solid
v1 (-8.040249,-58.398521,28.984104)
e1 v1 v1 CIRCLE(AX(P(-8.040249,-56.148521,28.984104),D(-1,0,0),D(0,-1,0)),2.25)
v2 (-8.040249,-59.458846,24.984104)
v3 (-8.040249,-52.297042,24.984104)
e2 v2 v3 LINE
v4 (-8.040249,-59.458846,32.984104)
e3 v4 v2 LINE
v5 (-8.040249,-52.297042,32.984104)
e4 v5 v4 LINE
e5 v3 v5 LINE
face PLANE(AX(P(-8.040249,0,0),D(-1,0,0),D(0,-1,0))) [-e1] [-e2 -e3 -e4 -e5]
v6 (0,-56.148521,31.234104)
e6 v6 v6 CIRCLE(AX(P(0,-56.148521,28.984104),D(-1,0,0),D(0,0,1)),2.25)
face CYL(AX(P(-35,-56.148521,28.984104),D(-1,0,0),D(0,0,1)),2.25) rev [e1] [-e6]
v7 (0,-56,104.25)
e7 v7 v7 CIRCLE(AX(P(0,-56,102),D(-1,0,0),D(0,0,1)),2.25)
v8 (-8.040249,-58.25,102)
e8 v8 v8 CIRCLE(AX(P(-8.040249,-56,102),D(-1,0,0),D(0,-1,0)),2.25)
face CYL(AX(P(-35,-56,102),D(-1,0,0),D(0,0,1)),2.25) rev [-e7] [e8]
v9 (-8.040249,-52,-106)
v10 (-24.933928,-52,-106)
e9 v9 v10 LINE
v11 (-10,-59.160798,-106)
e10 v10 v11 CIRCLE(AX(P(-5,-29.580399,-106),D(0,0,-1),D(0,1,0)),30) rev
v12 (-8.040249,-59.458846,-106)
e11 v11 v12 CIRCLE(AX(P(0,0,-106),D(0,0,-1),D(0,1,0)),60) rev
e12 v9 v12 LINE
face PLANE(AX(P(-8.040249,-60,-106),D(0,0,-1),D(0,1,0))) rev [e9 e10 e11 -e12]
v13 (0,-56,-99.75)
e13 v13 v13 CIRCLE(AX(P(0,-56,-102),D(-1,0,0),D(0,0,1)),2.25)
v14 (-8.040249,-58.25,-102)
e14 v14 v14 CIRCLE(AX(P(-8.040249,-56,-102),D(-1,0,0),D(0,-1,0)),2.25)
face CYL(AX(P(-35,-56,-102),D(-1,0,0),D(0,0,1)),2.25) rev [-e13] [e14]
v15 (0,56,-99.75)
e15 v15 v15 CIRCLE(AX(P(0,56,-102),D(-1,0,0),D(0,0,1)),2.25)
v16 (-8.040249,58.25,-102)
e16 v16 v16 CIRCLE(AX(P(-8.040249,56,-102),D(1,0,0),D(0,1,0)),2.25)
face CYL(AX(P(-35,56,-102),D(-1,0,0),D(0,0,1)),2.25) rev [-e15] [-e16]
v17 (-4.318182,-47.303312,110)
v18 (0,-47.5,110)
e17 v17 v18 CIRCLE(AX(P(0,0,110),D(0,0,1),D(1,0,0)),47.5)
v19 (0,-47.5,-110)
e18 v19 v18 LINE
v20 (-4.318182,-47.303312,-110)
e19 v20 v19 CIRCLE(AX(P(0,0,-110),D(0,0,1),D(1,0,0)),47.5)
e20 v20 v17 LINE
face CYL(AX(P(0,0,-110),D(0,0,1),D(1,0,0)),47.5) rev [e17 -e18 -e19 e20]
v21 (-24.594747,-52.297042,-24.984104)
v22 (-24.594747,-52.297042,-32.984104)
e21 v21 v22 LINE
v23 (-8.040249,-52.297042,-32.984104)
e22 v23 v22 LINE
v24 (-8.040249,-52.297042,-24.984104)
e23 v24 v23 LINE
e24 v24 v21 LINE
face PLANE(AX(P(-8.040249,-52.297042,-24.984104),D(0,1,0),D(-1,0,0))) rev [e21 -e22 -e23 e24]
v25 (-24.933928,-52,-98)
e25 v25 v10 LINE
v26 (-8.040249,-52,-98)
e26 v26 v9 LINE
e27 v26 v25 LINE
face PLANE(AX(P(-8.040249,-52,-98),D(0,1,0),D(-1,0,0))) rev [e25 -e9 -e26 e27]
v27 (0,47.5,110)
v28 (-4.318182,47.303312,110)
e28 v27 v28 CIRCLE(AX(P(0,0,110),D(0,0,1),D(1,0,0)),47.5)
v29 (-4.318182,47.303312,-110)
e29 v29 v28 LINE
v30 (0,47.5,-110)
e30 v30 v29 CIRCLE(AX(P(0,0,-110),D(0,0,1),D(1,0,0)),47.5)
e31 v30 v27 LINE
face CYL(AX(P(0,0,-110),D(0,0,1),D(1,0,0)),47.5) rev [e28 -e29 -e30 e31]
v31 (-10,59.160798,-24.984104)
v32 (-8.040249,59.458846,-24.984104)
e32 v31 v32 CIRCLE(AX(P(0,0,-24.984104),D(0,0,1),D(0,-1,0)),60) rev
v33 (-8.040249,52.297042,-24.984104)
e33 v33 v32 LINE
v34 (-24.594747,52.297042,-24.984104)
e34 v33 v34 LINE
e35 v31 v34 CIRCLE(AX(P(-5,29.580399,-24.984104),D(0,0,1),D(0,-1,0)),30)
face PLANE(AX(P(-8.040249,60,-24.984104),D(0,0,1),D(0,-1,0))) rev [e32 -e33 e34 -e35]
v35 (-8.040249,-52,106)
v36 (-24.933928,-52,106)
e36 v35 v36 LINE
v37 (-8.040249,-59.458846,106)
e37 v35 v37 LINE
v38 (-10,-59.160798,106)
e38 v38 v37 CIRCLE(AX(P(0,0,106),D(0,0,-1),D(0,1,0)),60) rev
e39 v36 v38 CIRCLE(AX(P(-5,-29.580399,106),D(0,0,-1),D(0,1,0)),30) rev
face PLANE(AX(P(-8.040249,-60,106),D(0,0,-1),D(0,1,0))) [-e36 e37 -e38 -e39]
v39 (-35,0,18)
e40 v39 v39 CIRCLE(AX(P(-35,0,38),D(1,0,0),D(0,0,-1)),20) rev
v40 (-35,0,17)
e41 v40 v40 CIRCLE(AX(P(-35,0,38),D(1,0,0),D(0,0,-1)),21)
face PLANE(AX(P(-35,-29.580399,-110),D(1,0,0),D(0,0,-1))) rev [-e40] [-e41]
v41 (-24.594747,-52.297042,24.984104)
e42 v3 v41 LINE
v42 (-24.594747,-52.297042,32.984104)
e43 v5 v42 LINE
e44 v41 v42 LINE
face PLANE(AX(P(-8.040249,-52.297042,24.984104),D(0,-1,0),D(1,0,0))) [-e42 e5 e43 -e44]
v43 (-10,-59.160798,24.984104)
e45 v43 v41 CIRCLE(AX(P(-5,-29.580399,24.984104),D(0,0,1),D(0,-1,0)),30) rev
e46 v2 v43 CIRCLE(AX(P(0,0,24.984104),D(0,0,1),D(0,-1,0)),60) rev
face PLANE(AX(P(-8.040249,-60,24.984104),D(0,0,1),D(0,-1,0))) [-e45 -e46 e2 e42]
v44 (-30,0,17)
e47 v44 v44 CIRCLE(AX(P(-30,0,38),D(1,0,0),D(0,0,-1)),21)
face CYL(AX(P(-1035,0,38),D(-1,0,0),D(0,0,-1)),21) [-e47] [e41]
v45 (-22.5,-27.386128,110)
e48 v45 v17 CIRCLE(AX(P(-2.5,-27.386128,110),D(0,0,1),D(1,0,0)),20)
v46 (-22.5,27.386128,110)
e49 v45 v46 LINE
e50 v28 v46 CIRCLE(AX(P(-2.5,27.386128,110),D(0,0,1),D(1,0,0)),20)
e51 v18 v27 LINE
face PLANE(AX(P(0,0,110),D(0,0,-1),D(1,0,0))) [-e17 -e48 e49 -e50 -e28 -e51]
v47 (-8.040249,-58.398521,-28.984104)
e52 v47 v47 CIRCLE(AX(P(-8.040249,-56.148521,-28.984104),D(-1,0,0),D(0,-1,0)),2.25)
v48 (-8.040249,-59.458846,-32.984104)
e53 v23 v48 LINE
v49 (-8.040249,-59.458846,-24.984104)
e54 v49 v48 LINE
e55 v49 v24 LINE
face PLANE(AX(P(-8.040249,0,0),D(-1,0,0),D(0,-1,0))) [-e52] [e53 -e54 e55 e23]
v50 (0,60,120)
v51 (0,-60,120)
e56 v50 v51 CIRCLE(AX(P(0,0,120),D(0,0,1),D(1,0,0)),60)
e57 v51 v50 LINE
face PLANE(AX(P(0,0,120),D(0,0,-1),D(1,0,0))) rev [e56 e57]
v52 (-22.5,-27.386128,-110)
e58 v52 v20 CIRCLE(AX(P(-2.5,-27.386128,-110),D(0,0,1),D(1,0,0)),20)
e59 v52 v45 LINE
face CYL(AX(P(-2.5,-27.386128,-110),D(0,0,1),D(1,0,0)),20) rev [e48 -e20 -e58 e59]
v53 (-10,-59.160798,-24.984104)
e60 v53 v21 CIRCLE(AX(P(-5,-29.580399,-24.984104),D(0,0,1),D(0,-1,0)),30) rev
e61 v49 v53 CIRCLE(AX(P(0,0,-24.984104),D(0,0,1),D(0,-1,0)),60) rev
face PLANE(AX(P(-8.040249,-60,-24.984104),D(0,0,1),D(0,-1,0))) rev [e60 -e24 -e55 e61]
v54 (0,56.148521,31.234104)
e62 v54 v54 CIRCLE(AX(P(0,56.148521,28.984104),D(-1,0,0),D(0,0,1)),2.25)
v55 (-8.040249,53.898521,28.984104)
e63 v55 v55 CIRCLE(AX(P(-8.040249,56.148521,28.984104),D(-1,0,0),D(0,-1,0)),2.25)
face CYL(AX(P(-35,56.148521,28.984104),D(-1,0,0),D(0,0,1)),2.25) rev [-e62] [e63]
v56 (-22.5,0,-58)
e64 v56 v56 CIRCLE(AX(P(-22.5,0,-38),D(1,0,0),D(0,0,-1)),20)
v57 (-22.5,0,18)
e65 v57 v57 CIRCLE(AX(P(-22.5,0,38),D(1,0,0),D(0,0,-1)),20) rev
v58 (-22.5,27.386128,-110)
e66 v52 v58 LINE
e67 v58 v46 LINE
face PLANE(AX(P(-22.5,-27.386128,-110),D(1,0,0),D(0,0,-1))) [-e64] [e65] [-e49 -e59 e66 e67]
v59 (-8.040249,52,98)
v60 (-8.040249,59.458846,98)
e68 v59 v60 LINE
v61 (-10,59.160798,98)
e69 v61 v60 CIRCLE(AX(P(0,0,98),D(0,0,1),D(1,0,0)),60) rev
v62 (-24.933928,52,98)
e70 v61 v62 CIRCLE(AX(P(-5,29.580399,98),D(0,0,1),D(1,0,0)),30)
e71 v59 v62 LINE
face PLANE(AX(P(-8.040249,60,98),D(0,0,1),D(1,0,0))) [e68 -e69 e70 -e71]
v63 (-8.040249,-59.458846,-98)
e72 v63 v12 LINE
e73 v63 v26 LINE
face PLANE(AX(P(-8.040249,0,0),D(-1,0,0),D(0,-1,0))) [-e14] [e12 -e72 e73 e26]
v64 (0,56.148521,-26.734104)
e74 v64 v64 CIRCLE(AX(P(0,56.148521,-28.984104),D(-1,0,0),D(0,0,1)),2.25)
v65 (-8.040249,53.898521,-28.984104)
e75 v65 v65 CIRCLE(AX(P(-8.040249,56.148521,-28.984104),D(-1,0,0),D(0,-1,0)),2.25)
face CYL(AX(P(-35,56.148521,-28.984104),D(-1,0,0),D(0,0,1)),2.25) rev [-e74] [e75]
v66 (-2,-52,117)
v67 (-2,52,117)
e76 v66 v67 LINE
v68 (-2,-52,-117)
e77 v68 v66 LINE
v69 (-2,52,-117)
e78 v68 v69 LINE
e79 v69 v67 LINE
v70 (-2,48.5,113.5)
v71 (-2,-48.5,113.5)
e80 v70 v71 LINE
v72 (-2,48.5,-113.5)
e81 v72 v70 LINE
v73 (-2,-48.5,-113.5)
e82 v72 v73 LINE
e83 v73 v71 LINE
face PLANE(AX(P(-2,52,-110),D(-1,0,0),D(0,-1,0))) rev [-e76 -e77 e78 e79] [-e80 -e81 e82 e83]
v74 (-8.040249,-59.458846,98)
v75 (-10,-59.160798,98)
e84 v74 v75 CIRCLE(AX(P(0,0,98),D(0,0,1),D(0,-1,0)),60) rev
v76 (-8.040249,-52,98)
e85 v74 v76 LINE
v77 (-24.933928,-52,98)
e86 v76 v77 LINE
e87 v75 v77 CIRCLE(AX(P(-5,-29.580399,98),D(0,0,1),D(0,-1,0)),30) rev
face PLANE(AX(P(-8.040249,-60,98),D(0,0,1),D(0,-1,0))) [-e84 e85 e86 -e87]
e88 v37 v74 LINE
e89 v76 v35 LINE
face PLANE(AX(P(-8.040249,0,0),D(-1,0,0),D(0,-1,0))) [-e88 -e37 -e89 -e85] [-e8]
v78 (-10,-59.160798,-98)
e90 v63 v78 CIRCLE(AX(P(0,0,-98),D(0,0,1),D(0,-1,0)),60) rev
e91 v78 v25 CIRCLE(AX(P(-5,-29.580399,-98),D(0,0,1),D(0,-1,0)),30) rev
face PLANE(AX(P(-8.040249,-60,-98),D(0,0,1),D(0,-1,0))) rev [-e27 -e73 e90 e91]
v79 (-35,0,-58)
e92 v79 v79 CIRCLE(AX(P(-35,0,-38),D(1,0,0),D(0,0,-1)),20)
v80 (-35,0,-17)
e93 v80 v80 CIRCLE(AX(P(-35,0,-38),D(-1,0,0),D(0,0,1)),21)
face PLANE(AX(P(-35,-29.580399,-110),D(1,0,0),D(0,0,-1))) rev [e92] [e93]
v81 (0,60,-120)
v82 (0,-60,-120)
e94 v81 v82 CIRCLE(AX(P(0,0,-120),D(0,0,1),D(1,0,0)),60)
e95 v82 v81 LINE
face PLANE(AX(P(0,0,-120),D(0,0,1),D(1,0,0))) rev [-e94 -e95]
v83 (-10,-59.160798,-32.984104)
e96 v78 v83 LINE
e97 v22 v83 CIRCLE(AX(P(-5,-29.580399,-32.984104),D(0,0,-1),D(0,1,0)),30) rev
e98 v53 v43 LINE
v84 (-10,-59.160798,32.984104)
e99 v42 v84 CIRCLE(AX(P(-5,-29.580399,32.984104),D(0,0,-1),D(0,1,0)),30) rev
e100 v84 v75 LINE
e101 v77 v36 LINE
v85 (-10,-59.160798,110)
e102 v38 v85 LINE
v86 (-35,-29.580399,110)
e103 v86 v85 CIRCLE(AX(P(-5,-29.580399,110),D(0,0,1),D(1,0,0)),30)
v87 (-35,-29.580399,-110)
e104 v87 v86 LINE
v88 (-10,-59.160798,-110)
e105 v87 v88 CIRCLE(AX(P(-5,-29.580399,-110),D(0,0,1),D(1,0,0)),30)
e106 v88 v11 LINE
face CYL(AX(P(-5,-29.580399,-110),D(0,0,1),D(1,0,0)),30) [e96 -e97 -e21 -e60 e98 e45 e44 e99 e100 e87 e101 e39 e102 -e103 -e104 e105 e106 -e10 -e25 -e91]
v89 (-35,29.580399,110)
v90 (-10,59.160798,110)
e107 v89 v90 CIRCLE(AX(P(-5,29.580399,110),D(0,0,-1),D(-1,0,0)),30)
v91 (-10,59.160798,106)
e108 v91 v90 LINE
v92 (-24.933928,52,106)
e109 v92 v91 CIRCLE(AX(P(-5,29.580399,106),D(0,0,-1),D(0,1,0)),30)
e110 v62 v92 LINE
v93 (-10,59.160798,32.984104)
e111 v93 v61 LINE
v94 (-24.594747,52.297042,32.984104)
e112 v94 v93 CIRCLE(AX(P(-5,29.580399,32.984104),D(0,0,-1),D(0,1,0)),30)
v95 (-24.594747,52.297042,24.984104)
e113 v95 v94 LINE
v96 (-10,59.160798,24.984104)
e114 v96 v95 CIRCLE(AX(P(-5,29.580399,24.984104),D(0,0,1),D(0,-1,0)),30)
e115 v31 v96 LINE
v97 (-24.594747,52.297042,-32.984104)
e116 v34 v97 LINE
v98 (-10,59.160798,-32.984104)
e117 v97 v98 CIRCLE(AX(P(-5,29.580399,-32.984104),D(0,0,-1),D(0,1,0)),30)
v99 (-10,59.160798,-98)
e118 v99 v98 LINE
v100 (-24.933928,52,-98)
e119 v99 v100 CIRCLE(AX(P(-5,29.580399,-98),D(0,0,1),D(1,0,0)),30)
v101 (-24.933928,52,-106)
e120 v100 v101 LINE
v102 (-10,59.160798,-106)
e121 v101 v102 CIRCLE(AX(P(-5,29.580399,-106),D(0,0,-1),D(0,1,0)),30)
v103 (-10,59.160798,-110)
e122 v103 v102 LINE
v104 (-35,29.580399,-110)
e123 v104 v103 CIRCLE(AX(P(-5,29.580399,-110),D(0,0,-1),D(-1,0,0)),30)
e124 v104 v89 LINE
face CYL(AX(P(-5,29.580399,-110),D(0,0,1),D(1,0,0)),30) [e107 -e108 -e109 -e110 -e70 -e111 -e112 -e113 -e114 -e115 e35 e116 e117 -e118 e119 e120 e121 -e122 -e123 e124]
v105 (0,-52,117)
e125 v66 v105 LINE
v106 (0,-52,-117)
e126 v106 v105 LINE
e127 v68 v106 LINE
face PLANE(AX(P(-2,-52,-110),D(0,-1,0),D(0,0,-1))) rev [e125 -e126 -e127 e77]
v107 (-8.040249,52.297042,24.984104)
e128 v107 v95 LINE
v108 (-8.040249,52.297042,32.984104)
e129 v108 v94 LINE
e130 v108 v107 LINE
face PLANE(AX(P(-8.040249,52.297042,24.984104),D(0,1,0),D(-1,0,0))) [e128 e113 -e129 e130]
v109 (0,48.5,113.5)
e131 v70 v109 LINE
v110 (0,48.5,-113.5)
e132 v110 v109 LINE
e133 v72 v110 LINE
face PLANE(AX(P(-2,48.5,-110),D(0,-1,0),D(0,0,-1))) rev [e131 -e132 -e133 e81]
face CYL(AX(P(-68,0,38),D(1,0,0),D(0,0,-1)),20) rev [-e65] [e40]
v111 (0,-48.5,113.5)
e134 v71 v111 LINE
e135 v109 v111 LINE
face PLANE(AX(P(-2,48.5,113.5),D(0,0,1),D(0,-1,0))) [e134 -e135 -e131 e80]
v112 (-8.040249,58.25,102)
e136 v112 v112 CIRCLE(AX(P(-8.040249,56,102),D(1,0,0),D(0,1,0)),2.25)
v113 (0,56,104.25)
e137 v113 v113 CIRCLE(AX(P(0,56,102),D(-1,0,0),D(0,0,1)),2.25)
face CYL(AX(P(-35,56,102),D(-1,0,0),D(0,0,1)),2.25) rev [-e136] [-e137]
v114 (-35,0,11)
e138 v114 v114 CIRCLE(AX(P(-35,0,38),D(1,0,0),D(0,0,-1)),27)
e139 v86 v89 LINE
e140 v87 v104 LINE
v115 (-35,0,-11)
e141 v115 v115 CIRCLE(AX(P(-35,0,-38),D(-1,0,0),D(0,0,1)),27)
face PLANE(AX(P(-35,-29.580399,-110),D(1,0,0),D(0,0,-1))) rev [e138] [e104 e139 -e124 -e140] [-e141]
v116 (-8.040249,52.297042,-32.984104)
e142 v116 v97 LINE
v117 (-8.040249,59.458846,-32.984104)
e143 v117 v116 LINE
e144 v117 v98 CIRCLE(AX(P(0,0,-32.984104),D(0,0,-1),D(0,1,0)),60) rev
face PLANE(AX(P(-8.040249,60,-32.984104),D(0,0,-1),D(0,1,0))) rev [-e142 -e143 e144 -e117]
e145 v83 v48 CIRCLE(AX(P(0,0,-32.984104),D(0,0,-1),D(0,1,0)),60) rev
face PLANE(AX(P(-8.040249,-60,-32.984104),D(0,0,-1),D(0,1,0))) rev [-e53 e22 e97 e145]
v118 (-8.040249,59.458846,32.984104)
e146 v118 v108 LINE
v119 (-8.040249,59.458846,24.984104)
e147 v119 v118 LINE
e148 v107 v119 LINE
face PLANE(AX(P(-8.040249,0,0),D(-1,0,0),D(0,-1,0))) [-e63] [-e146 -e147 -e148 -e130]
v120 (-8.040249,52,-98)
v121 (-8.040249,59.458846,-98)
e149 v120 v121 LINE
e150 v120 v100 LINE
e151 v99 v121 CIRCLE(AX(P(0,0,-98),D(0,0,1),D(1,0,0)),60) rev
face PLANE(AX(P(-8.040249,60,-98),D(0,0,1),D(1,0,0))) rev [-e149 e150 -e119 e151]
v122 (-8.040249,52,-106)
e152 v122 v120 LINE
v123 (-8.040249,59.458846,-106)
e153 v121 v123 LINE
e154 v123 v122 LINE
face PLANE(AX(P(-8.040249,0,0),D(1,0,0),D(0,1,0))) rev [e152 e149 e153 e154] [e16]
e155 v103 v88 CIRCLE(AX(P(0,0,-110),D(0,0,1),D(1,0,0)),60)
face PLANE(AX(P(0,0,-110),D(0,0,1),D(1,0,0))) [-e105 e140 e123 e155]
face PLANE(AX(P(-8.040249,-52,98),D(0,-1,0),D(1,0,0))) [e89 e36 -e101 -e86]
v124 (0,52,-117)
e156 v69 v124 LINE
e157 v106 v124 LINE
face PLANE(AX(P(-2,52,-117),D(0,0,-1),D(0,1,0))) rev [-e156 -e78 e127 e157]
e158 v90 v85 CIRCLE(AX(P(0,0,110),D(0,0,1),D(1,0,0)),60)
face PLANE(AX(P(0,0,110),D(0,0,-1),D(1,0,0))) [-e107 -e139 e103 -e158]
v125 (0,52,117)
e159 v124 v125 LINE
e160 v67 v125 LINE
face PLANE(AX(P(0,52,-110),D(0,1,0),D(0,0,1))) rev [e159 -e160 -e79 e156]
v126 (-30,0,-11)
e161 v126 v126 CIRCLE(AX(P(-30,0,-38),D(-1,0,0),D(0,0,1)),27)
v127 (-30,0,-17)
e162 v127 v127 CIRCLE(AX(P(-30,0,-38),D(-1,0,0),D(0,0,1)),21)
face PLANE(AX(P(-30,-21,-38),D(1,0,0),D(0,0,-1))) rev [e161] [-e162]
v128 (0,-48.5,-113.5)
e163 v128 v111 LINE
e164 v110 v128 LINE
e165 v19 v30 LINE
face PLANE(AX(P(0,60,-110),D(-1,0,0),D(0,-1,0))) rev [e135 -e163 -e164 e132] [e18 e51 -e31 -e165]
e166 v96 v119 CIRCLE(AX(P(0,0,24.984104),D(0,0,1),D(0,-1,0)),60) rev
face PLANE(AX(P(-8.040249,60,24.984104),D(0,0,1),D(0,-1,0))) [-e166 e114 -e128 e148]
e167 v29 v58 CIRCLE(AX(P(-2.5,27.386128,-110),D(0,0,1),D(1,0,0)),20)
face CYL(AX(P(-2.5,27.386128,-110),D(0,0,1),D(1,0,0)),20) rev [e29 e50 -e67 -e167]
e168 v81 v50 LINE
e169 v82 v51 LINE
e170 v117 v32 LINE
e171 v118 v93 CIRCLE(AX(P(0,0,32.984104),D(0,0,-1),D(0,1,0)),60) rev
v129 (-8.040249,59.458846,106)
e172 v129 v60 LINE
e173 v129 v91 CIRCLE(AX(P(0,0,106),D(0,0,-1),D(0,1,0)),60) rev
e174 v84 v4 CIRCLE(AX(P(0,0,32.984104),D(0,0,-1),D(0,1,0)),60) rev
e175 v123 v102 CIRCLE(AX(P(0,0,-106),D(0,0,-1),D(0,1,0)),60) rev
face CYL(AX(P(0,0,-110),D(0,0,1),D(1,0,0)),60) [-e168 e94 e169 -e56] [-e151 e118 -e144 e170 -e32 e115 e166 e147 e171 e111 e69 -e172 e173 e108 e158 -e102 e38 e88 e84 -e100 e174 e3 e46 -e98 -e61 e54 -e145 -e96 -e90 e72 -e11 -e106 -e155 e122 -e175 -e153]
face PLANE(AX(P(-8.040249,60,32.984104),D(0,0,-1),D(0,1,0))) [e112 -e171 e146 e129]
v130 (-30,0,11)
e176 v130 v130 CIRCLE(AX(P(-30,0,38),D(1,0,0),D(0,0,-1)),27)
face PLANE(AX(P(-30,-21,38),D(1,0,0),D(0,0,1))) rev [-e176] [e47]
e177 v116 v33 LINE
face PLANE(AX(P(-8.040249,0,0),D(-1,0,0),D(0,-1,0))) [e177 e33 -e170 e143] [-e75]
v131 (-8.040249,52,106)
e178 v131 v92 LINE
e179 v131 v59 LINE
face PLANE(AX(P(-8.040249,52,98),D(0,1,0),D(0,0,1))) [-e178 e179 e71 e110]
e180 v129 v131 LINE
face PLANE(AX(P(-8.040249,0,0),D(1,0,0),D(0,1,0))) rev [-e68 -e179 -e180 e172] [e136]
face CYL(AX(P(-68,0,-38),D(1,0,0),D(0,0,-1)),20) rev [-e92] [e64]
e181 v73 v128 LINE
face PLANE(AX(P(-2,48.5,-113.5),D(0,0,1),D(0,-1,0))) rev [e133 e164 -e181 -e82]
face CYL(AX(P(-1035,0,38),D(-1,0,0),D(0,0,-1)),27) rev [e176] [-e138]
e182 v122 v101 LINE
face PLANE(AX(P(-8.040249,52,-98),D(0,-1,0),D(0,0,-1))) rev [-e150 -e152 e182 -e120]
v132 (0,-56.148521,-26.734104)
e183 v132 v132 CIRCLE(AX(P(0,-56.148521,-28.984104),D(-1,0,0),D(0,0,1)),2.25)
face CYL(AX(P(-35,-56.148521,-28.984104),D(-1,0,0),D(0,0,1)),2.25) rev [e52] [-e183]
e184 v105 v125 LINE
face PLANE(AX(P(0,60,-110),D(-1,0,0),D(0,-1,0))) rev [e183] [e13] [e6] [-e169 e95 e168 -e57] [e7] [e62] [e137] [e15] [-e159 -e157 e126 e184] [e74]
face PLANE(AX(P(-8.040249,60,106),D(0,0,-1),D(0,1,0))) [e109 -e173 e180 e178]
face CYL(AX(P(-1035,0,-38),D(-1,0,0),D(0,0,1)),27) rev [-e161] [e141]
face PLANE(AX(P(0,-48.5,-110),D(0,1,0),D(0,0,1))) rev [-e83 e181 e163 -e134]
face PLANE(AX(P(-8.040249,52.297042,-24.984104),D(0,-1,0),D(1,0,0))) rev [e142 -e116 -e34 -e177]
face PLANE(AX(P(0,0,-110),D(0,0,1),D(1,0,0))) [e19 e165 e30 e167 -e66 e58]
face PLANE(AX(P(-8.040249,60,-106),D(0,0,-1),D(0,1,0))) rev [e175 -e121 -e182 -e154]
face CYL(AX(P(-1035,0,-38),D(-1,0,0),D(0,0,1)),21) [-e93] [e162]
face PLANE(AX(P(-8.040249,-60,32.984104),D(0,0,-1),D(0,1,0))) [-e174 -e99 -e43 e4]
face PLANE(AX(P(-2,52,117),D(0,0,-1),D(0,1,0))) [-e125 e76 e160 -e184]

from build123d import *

# Parameters (mm, degrees)
BOSS_EXTRUDE1_DEPTH            = 110
BOSS_EXTRUDE3_START            = -110
BOSS_EXTRUDE3_DEPTH            = 10
SKETCH11_W                     = 8
SKETCH11_H                     = 7.702958
SKETCH11_H_2                   = 8
CUT_EXTRUDE1_DEPTH             = 51
M4_CLEARANCE_HOLE1_D           = 4.5
M4_CLEARANCE_HOLE1_CSINK_D     = 4.55
M4_CLEARANCE_HOLE1_CSINK_ANGLE = 90
CUT_EXTRUDE2_START             = -20
SKETCH14_R                     = 20
CUT_EXTRUDE2_DEPTH             = 48
CUT_EXTRUDE3_DEPTH             = 2
SKETCH22_W                     = 5
SKETCH22_H                     = 6


with BuildPart() as part:
    # Sketch1 → Boss-Extrude1 (new body)
    with BuildSketch(Plane.XY):
        with BuildLine():
            Line((0, 52), (-2, 52))
            Line((-2, 52), (-2, 48.5))
            Line((-2, 48.5), (0, 48.5))
            Line((0, 48.5), (0, 47.5))
            ThreePointArc((0, 47.5), (-2.161329, 47.450802), (-4.318182, 47.303312))
            ThreePointArc((-4.318182, 47.303312), (-17.270979, 40.870125), (-22.5, 27.386128))
            Line((-22.5, 27.386128), (-22.5, -27.386128))
            ThreePointArc((-22.5, -27.386128), (-17.270979, -40.870125), (-4.318182, -47.303312))
            ThreePointArc((-4.318182, -47.303312), (-2.161329, -47.450802), (0, -47.5))
            Line((0, -47.5), (0, -48.5))
            Line((0, -48.5), (-2, -48.5))
            Line((-2, -48.5), (-2, -52))
            Line((-2, -52), (0, -52))
            Line((0, -52), (0, -60))
            ThreePointArc((0, -60), (-5.017576, -59.789831), (-10, -59.160798))
            ThreePointArc((-10, -59.160798), (-27.912878, -48.945316), (-35, -29.580399))
            Line((-35, -29.580399), (-35, 29.580399))
            ThreePointArc((-35, 29.580399), (-27.912878, 48.945316), (-10, 59.160798))
            ThreePointArc((-10, 59.160798), (-5.017576, 59.789831), (0, 60))
            Line((0, 60), (0, 52))
        make_face()
    boss_extrude1 = extrude(amount=-BOSS_EXTRUDE1_DEPTH)

    # Sketch7 → Boss-Extrude3 (add)
    with BuildSketch(Plane.XY.offset(BOSS_EXTRUDE3_START)):
        with BuildLine():
            Line((0, 60), (0, -60))
            ThreePointArc((0, -60), (-60, 0), (0, 60))
        make_face()
    boss_extrude3 = extrude(amount=-BOSS_EXTRUDE3_DEPTH)

    # Sketch11 → Cut-Extrude1 (cut)
    with BuildSketch(Plane(origin=(-59.040249, 0, 0), x_dir=(0, 0, -1), z_dir=(-1, 0, 0))):
        with Locations((28.984104, 56.148521)):
            Rectangle(SKETCH11_W, SKETCH11_H)
        with Locations((102, 56)):
            Rectangle(SKETCH11_W, SKETCH11_H_2)
        with Locations((28.984104, -56.148521)):
            Rectangle(SKETCH11_W, SKETCH11_H)
        with Locations((102, -56)):
            Rectangle(SKETCH11_W, SKETCH11_H_2)
    cut_extrude1 = extrude(amount=-CUT_EXTRUDE1_DEPTH, mode=Mode.SUBTRACT)

    # M4 Clearance Hole1 (through all)
    with Locations(Plane.ZY.offset(35)):
        with Locations((-28.984104, -56.148521), (-102, 56), (-28.984104, 56.148521), (-102, -56)):
            m4_clearance_hole1 = CounterSinkHole(M4_CLEARANCE_HOLE1_D / 2, M4_CLEARANCE_HOLE1_CSINK_D / 2, counter_sink_angle=M4_CLEARANCE_HOLE1_CSINK_ANGLE)

    # Sketch14 → Cut-Extrude2 (cut)
    with BuildSketch(Plane(origin=(0, 0, 0), x_dir=(0, 0, -1), z_dir=(1, 0, 0)).offset(CUT_EXTRUDE2_START)):
        with Locations((38, 0)):
            Circle(SKETCH14_R)
    cut_extrude2 = extrude(amount=-CUT_EXTRUDE2_DEPTH, mode=Mode.SUBTRACT)

    # Sketch8 → Cut-Extrude3 (cut)
    with BuildSketch(Plane(origin=(0, 0, 0), x_dir=(0, 0, -1), z_dir=(1, 0, 0))):
        Polygon((117, 52), (117, -52), (110, -52), (110, -48.5), (113.5, -48.5), (113.5, 48.5), (110, 48.5), (110, 52), align=None)
    cut_extrude3 = extrude(amount=-CUT_EXTRUDE3_DEPTH, mode=Mode.SUBTRACT)

    # Sketch22 → Cut-Revolve4 (revolve, cut)
    with BuildSketch(Plane.XY.offset(-38)):
        with Locations((-32.5, -24)):
            Rectangle(SKETCH22_W, SKETCH22_H)
    cut_revolve4 = revolve(axis=Axis((-1035, 0, -38), (1, 0, 0)), mode=Mode.SUBTRACT)

    # Mirror3: Boss-Extrude1, Boss-Extrude3, Cut-Extrude1, M4 Clearance Hole1, Cut-Extrude2, Cut-Extrude3, Cut-Revolve4 across plane
    add(boss_extrude1.mirror(Plane.XY))
    add(boss_extrude3.mirror(Plane.XY))
    add(cut_extrude1.mirror(Plane.XY), mode=Mode.SUBTRACT)
    add(m4_clearance_hole1.mirror(Plane.XY), mode=Mode.SUBTRACT)
    add(cut_extrude2.mirror(Plane.XY), mode=Mode.SUBTRACT)
    add(cut_extrude3.mirror(Plane.XY), mode=Mode.SUBTRACT)
    add(cut_revolve4.mirror(Plane.XY), mode=Mode.SUBTRACT)


solid = part.part
